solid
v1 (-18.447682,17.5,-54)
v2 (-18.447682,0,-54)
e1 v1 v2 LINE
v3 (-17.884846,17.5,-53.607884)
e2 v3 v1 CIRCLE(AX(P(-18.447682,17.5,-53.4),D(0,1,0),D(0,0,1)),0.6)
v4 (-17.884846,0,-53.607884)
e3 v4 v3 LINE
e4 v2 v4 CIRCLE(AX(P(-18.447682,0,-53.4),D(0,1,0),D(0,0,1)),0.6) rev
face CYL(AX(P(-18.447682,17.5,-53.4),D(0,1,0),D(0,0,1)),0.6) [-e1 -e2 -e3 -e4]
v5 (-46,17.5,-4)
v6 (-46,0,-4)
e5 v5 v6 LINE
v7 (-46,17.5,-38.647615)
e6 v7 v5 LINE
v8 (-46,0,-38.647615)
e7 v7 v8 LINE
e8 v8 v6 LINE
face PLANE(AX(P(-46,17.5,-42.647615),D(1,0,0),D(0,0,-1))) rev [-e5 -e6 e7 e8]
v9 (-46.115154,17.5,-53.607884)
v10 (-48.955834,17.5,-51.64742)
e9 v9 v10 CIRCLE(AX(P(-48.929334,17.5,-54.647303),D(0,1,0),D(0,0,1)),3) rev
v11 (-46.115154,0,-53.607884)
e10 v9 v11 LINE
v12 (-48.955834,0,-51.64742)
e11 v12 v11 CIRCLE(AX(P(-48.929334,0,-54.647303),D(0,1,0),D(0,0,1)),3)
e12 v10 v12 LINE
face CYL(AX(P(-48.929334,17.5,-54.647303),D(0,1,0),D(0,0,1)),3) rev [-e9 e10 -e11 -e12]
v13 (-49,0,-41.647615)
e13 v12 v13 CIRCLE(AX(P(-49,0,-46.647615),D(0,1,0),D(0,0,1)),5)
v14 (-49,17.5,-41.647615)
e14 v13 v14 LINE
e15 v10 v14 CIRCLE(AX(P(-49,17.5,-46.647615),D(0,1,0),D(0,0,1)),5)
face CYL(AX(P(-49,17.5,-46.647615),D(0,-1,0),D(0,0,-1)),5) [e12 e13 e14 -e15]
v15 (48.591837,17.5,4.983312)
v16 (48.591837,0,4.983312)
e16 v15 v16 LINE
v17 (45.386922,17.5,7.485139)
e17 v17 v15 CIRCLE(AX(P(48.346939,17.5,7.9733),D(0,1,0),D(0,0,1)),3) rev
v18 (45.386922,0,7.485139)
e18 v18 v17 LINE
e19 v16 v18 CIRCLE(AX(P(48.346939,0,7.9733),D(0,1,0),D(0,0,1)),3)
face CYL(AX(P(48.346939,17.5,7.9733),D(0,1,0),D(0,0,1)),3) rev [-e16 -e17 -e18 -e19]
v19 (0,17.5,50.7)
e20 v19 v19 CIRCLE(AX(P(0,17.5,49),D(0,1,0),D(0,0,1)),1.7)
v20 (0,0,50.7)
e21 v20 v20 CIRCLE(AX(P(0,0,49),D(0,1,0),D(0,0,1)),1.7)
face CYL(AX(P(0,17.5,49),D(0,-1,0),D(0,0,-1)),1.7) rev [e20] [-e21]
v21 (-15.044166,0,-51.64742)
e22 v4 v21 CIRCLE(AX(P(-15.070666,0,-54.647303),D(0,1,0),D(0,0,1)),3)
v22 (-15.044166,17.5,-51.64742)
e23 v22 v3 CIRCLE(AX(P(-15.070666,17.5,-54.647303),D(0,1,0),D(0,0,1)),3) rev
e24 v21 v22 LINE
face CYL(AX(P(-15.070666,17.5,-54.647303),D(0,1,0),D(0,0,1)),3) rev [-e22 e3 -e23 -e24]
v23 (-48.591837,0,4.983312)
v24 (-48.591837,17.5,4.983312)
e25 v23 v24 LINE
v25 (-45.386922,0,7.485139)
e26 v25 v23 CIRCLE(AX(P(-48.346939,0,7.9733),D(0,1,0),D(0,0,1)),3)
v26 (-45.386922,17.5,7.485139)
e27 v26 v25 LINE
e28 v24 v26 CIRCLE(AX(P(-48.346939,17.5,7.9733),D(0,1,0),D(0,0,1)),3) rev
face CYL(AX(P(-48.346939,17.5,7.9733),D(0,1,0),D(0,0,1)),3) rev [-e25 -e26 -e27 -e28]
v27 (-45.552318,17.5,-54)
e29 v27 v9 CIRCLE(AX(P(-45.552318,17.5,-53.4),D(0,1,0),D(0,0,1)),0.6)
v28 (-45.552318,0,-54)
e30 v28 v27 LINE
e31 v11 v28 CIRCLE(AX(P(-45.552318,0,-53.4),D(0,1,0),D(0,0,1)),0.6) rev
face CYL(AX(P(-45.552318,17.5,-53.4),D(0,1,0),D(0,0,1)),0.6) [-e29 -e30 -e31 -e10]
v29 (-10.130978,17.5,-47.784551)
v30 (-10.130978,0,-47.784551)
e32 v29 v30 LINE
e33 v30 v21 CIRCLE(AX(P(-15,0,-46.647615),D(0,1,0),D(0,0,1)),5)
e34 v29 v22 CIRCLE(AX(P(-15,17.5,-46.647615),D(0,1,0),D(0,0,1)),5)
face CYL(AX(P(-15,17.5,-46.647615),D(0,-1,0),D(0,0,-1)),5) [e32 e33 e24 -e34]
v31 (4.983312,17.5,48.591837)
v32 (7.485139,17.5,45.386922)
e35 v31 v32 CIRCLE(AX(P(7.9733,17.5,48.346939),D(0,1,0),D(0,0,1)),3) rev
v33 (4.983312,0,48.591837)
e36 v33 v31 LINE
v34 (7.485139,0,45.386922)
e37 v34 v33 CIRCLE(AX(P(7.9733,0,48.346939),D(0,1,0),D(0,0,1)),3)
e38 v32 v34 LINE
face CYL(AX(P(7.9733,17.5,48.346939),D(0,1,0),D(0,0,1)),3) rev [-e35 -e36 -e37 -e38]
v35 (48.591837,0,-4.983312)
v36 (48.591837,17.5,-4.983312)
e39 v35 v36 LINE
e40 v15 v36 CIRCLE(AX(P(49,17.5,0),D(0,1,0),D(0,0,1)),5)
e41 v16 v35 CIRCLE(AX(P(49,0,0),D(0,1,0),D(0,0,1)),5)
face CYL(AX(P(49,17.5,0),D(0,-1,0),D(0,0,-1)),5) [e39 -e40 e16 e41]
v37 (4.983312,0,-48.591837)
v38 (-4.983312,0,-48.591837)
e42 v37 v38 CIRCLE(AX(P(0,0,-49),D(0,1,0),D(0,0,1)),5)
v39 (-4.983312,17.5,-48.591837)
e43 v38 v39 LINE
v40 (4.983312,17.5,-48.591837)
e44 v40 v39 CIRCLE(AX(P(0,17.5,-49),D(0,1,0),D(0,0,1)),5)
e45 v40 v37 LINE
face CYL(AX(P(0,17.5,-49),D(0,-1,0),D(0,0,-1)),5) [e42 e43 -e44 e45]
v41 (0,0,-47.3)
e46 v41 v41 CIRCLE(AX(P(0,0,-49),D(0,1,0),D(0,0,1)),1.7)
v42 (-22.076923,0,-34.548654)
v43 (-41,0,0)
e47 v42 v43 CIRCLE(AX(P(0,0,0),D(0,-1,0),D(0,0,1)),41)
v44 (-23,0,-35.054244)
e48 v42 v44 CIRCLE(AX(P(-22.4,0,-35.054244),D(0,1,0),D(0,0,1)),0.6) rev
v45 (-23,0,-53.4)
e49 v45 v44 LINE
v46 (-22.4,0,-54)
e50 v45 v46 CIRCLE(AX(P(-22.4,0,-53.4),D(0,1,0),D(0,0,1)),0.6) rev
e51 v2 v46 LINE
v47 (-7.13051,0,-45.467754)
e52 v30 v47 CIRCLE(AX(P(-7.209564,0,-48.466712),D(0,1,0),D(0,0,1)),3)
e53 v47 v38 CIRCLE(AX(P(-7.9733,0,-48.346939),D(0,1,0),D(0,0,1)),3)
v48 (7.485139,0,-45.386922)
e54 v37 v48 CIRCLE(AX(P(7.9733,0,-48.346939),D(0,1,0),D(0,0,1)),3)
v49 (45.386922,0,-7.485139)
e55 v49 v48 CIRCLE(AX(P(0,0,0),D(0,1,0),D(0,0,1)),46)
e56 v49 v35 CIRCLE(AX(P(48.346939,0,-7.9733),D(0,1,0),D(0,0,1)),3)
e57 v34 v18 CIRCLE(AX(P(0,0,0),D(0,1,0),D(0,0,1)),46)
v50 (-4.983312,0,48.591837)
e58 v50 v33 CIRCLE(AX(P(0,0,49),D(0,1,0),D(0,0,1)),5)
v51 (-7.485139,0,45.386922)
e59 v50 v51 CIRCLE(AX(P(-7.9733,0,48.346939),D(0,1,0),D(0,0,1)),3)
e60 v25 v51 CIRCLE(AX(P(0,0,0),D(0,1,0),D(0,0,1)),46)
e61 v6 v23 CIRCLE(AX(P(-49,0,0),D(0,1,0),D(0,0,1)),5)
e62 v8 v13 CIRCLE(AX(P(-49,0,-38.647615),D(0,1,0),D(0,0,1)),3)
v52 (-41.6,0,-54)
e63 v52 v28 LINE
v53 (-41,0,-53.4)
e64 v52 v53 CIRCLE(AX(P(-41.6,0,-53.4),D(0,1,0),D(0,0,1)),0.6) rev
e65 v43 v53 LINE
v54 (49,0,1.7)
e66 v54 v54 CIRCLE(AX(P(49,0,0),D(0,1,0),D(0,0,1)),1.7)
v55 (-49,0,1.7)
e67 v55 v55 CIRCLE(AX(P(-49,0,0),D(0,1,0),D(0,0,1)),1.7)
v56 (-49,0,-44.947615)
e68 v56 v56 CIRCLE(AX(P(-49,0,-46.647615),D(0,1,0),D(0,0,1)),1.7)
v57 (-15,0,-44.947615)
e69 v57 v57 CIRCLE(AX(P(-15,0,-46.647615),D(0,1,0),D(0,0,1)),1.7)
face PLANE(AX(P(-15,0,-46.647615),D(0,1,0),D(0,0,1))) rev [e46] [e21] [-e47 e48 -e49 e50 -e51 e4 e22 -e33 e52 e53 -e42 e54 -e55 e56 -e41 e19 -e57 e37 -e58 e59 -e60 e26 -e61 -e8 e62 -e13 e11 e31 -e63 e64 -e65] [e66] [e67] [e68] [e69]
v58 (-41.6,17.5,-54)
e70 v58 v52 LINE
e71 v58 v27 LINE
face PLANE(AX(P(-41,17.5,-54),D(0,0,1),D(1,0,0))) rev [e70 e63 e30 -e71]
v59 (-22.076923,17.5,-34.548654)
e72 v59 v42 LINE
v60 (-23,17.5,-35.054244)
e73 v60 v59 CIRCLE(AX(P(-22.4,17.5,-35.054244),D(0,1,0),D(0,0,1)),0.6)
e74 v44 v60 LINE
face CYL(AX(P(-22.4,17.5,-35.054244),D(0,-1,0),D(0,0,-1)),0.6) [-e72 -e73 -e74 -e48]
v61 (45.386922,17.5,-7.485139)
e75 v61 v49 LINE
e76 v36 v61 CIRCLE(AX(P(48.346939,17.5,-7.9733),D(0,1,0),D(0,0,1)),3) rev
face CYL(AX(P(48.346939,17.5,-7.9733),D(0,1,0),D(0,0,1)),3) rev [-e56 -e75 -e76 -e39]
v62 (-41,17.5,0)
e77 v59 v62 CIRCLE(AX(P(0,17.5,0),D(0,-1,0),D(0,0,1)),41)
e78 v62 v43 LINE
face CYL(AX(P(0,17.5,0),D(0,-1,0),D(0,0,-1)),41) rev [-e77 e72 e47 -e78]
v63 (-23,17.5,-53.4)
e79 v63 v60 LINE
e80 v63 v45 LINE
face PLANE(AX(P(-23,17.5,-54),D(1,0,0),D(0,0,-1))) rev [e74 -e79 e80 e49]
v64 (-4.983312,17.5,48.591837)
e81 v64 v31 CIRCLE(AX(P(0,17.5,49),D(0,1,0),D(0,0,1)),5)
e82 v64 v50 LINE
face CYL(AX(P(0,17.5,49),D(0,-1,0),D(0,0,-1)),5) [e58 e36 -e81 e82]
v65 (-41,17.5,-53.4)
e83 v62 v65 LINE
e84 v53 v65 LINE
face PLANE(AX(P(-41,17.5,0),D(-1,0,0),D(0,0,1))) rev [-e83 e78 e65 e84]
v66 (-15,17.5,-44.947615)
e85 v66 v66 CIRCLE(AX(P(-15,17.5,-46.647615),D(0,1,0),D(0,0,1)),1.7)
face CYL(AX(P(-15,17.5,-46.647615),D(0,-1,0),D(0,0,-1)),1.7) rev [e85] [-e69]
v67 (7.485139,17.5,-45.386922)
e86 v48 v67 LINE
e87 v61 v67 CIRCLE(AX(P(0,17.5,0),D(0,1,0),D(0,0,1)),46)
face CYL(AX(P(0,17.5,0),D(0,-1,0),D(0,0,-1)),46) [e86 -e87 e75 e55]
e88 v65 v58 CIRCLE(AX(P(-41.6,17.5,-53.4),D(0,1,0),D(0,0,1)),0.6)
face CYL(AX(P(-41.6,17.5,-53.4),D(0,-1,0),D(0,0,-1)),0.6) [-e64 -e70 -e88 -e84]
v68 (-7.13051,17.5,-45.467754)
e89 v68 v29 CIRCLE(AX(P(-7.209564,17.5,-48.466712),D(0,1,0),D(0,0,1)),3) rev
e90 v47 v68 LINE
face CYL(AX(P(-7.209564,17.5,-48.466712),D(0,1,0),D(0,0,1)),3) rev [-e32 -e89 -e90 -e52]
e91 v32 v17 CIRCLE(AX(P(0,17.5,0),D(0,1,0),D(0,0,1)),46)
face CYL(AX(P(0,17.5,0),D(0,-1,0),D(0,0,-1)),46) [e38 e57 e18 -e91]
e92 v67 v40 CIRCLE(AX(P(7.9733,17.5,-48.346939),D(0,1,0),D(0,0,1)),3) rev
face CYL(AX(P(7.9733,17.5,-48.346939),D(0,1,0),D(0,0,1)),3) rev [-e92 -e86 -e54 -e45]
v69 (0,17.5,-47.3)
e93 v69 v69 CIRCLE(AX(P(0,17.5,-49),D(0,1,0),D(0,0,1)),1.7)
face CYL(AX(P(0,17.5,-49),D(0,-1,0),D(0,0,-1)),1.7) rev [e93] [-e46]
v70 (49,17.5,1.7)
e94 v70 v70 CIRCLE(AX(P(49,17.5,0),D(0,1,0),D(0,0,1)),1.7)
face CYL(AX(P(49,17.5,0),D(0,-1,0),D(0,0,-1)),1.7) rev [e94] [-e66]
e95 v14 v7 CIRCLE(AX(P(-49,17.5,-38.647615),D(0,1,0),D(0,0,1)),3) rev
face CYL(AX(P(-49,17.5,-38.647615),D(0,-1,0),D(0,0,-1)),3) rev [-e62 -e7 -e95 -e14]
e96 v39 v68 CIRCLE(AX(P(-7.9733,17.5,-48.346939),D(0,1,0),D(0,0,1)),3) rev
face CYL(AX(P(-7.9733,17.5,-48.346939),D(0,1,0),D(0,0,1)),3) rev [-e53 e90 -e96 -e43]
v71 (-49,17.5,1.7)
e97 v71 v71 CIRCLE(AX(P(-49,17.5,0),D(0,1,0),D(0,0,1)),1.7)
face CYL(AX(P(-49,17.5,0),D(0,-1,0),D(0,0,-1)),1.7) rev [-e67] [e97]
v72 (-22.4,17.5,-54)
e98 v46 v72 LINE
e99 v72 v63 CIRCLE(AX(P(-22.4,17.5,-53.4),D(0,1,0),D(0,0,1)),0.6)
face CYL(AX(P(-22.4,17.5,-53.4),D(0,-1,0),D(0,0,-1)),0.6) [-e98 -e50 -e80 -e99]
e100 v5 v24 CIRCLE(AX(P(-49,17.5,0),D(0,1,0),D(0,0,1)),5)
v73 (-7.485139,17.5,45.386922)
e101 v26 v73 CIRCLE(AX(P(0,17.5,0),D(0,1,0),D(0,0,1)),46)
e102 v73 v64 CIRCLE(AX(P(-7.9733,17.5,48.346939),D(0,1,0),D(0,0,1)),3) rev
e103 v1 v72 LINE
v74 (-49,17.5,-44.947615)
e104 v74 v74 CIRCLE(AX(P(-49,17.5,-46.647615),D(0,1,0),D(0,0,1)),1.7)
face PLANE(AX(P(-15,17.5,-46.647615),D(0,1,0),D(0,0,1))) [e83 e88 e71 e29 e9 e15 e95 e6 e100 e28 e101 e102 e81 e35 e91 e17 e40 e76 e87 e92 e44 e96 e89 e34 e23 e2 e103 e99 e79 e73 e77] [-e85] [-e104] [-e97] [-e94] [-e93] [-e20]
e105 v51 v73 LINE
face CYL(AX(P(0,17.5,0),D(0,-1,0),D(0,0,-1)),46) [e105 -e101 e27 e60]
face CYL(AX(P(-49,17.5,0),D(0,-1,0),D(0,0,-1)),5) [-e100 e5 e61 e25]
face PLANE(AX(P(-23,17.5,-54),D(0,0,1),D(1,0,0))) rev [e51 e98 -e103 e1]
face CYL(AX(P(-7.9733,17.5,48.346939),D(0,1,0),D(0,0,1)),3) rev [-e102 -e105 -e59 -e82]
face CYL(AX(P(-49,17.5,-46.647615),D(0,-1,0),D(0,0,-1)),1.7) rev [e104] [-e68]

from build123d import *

# Parameters (mm, degrees)
SKETCH_1_R      = 1.7
EXTRUDE_1_DEPTH = 17.5
FILLET_1_R      = 3
FILLET_2_R      = 0.6


with BuildPart() as part:
    # 草图1 → 凸台-拉伸1 (new body)
    with BuildSketch(Plane(origin=(0, 0, 0), x_dir=(1, 0, 0), z_dir=(0, 1, 0))):
        with BuildLine():
            Line((-41, 0), (-41, 54))
            Line((-41, 54), (-46, 54))
            Line((-46, 54), (-46, 50.647615159))
            ThreePointArc((-46, 50.647615159), (-54, 46.647615159), (-46, 42.647615159))
            Line((-46, 42.647615159), (-46, 4))
            ThreePointArc((-46, 4), (-53.998925026, -0.103675394), (-45.836734694, -3.872176727))
            ThreePointArc((-45.836734694, -3.872176727), (-32.526911935, -32.526911935), (-3.872176727, -45.836734694))
            ThreePointArc((-3.872176727, -45.836734694), (0, -54), (3.872176727, -45.836734694))
            ThreePointArc((3.872176727, -45.836734694), (32.526911935, -32.526911935), (45.836734694, -3.872176727))
            ThreePointArc((45.836734694, -3.872176727), (54, 0), (45.836734694, 3.872176727))
            ThreePointArc((45.836734694, 3.872176727), (32.526911935, 32.526911935), (3.872176727, 45.836734694))
            ThreePointArc((3.872176727, 45.836734694), (0, 54), (-3.872176727, 45.836734694))
            ThreePointArc((-3.872176727, 45.836734694), (-7.126872346, 45.444556226), (-10.345371646, 44.821571654))
            ThreePointArc((-10.345371646, 44.821571654), (-11.971775359, 50.626290255), (-18, 50.647615159))
            Line((-18, 50.647615159), (-18, 54))
            Line((-18, 54), (-23, 54))
            Line((-23, 54), (-23, 33.941125497))
            ThreePointArc((-23, 33.941125497), (36.221540553, -19.209372712), (-41, 0))
        make_face()
        with Locations(Location((0, 49, 0), (0, 0, 270))):
            Circle(SKETCH_1_R, mode=Mode.SUBTRACT)
        with Locations(Location((49, 0, 0), (0, 0, 270))):
            Circle(SKETCH_1_R, mode=Mode.SUBTRACT)
        with Locations(Location((0, -49, 0), (0, 0, 270))):
            Circle(SKETCH_1_R, mode=Mode.SUBTRACT)
        with Locations(Location((-49, 0, 0), (0, 0, 270))):
            Circle(SKETCH_1_R, mode=Mode.SUBTRACT)
        with Locations(Location((-15, 46.647615159, 0), (0, 0, 270))):
            Circle(SKETCH_1_R, mode=Mode.SUBTRACT)
        with Locations(Location((-49, 46.647615159, 0), (0, 0, 270))):
            Circle(SKETCH_1_R, mode=Mode.SUBTRACT)
    extrude(amount=EXTRUDE_1_DEPTH)

    # 圆角1
    # the kernel refuses this fillet: 3 mm, written as the material it adds along each edge
    with BuildSketch(Plane(origin=(-3.872176727, 0, -45.836734694), x_dir=(-0.37402840247840613, 0, -0.9274172492138861), z_dir=(0, 1, 0)), Plane(origin=(45.836734694, 0, -3.872176727), x_dir=(0.9274172492138857, 0, -0.37402840247840763), z_dir=(0, 1, 0)), Plane(origin=(3.872176727, 0, 45.836734694), x_dir=(0.374028402478409, 0, 0.9274172492138849), z_dir=(0, 1, 0)), Plane(origin=(-45.836734694, 0, 3.872176727), x_dir=(-0.9274172492138864, 0, 0.3740284024784056), z_dir=(0, 1, 0))) as fillet_1_piece_1:
        with BuildLine():
            CenterArc((3.861943107, 2.864564734), FILLET_1_R, 167.400558819, 85.317583138)
            Line((0.934186439, 3.518965904), (0.875631305, 3.532053927))
            ThreePointArc((0.875631305, 3.532053927), (0.44393089, 1.765631899), (-0.057336629, 0.017677979))
            Line((-0.057336629, 0.017677979), (0.017824353, -0.057291295))
            ThreePointArc((0.017824353, -0.057291295), (1.485362734, 0.165725443), (2.952901114, -0.057291295))
            Line((2.952901114, -0.057291295), (2.970725467, 0))
        make_face()
    extrude(amount=17.5)
    with BuildSketch(Plane(origin=(3.872176727, 0, -45.836734694), x_dir=(0.9923388633046951, 0, 0.12354586344813656), z_dir=(0, 1, 0)), Plane(origin=(45.836734694, 0, 3.872176727), x_dir=(-0.12354586344813612, 0, 0.9923388633046951), z_dir=(0, 1, 0)), Plane(origin=(-3.872176727, 0, 45.836734694), x_dir=(-0.9923388633046952, 0, -0.12354586344813587), z_dir=(0, 1, 0)), Plane(origin=(-10.345371646, 0, -44.821571654), x_dir=(0.982518966413127, 0, -0.18616251136703332), z_dir=(0, 1, 0))) as fillet_1_piece_2:
        with BuildLine():
            CenterArc((3.759578561, 2.997649867), FILLET_1_R, 182.41437212, 85.317583138)
            Line((0.762241678, 2.871271047), (0.70229494, 2.868743471))
            ThreePointArc((0.70229494, 2.868743471), (0.541298099, 1.393112968), (-0.050799838, 0.031927676))
            Line((-0.050799838, 0.031927676), (0.002374471, -0.059952997))
            ThreePointArc((0.002374471, -0.059952997), (1.820427514, -0.023964621), (3.638480557, -0.059952997))
            Line((3.638480557, -0.059952997), (3.640855028, 0))
        make_face()
    extrude(amount=17.5)
    with BuildSketch(Plane(origin=(-46, 0, -42.647615159), x_dir=(-0.9486832980505127, 0, 0.31622776601684127), z_dir=(0, 1, 0))) as fillet_1_piece_3:
        with BuildLine():
            CenterArc((4.110960958, 2.846049894), FILLET_1_R, 161.565051177, 90)
            Line((1.264911064, 3.794733192), (1.207990066, 3.813706858))
            Line((1.207990066, 3.813706858), (-0.056920998, 0.018973666))
            Line((-0.056920998, 0.018973666), (0.018973666, -0.056920998))
            ThreePointArc((0.018973666, -0.056920998), (1.58113883, 0.19658351), (3.143303994, -0.056920998))
            Line((3.143303994, -0.056920998), (3.16227766, 0))
        make_face()
    extrude(amount=17.5)
    with BuildSketch(Plane(origin=(-46, 0, -50.647615159), x_dir=(1.5090941279718801e-12, 0, -1.0), z_dir=(0, 1, 0))) as fillet_1_piece_4:
        with BuildLine():
            CenterArc((3.99968789, 2.929334184), FILLET_1_R, 179.493886793, 78.04554374)
            Line((0.999804931, 2.955833865), (0.939807272, 2.956363859))
            ThreePointArc((0.939807272, 2.956363859), (0.679550236, 1.417151431), (-0.048, 0.036))
            Line((-0.048, 0.036), (0, -0.06))
            ThreePointArc((0, -0.06), (1.676192421, -0.06), (3.33943878, -0.058586684))
            Line((3.33943878, -0.058586684), (3.352384841, 0))
        make_face()
    extrude(amount=17.5)
    with BuildSketch(Plane(origin=(-18, 0, -50.647615159), x_dir=(0.9472773756522823, 0, -0.3204146900148692), z_dir=(0, 1, 0))) as fillet_1_piece_5:
        with BuildLine():
            CenterArc((4.056450754, 2.850212144), FILLET_1_R, 173.772564041, 78.04554374)
            Line((1.07415335, 3.175638315), (1.014507402, 3.182146838))
            ThreePointArc((1.014507402, 3.182146838), (0.480240032, 1.607044039), (-0.056836643, 0.019224881))
            Line((-0.056836643, 0.019224881), (0.01872208, -0.057004243))
            ThreePointArc((0.01872208, -0.057004243), (1.560173367, 0.189646427), (3.101624653, -0.057004243))
            Line((3.101624653, -0.057004243), (3.120346734, 0))
        make_face()
    extrude(amount=17.5)

    # 圆角2
    fillet_2_edges = [part.edges().sort_by_distance(p)[0] for p in [
        (-46, 8.75, -54),
        (-41, 8.75, -54),
        (-23, 8.75, -33.941125497),
        (-23, 8.75, -54),
        (-18, 8.75, -54),
    ]]
    fillet(fillet_2_edges, radius=FILLET_2_R)


solid = part.part
